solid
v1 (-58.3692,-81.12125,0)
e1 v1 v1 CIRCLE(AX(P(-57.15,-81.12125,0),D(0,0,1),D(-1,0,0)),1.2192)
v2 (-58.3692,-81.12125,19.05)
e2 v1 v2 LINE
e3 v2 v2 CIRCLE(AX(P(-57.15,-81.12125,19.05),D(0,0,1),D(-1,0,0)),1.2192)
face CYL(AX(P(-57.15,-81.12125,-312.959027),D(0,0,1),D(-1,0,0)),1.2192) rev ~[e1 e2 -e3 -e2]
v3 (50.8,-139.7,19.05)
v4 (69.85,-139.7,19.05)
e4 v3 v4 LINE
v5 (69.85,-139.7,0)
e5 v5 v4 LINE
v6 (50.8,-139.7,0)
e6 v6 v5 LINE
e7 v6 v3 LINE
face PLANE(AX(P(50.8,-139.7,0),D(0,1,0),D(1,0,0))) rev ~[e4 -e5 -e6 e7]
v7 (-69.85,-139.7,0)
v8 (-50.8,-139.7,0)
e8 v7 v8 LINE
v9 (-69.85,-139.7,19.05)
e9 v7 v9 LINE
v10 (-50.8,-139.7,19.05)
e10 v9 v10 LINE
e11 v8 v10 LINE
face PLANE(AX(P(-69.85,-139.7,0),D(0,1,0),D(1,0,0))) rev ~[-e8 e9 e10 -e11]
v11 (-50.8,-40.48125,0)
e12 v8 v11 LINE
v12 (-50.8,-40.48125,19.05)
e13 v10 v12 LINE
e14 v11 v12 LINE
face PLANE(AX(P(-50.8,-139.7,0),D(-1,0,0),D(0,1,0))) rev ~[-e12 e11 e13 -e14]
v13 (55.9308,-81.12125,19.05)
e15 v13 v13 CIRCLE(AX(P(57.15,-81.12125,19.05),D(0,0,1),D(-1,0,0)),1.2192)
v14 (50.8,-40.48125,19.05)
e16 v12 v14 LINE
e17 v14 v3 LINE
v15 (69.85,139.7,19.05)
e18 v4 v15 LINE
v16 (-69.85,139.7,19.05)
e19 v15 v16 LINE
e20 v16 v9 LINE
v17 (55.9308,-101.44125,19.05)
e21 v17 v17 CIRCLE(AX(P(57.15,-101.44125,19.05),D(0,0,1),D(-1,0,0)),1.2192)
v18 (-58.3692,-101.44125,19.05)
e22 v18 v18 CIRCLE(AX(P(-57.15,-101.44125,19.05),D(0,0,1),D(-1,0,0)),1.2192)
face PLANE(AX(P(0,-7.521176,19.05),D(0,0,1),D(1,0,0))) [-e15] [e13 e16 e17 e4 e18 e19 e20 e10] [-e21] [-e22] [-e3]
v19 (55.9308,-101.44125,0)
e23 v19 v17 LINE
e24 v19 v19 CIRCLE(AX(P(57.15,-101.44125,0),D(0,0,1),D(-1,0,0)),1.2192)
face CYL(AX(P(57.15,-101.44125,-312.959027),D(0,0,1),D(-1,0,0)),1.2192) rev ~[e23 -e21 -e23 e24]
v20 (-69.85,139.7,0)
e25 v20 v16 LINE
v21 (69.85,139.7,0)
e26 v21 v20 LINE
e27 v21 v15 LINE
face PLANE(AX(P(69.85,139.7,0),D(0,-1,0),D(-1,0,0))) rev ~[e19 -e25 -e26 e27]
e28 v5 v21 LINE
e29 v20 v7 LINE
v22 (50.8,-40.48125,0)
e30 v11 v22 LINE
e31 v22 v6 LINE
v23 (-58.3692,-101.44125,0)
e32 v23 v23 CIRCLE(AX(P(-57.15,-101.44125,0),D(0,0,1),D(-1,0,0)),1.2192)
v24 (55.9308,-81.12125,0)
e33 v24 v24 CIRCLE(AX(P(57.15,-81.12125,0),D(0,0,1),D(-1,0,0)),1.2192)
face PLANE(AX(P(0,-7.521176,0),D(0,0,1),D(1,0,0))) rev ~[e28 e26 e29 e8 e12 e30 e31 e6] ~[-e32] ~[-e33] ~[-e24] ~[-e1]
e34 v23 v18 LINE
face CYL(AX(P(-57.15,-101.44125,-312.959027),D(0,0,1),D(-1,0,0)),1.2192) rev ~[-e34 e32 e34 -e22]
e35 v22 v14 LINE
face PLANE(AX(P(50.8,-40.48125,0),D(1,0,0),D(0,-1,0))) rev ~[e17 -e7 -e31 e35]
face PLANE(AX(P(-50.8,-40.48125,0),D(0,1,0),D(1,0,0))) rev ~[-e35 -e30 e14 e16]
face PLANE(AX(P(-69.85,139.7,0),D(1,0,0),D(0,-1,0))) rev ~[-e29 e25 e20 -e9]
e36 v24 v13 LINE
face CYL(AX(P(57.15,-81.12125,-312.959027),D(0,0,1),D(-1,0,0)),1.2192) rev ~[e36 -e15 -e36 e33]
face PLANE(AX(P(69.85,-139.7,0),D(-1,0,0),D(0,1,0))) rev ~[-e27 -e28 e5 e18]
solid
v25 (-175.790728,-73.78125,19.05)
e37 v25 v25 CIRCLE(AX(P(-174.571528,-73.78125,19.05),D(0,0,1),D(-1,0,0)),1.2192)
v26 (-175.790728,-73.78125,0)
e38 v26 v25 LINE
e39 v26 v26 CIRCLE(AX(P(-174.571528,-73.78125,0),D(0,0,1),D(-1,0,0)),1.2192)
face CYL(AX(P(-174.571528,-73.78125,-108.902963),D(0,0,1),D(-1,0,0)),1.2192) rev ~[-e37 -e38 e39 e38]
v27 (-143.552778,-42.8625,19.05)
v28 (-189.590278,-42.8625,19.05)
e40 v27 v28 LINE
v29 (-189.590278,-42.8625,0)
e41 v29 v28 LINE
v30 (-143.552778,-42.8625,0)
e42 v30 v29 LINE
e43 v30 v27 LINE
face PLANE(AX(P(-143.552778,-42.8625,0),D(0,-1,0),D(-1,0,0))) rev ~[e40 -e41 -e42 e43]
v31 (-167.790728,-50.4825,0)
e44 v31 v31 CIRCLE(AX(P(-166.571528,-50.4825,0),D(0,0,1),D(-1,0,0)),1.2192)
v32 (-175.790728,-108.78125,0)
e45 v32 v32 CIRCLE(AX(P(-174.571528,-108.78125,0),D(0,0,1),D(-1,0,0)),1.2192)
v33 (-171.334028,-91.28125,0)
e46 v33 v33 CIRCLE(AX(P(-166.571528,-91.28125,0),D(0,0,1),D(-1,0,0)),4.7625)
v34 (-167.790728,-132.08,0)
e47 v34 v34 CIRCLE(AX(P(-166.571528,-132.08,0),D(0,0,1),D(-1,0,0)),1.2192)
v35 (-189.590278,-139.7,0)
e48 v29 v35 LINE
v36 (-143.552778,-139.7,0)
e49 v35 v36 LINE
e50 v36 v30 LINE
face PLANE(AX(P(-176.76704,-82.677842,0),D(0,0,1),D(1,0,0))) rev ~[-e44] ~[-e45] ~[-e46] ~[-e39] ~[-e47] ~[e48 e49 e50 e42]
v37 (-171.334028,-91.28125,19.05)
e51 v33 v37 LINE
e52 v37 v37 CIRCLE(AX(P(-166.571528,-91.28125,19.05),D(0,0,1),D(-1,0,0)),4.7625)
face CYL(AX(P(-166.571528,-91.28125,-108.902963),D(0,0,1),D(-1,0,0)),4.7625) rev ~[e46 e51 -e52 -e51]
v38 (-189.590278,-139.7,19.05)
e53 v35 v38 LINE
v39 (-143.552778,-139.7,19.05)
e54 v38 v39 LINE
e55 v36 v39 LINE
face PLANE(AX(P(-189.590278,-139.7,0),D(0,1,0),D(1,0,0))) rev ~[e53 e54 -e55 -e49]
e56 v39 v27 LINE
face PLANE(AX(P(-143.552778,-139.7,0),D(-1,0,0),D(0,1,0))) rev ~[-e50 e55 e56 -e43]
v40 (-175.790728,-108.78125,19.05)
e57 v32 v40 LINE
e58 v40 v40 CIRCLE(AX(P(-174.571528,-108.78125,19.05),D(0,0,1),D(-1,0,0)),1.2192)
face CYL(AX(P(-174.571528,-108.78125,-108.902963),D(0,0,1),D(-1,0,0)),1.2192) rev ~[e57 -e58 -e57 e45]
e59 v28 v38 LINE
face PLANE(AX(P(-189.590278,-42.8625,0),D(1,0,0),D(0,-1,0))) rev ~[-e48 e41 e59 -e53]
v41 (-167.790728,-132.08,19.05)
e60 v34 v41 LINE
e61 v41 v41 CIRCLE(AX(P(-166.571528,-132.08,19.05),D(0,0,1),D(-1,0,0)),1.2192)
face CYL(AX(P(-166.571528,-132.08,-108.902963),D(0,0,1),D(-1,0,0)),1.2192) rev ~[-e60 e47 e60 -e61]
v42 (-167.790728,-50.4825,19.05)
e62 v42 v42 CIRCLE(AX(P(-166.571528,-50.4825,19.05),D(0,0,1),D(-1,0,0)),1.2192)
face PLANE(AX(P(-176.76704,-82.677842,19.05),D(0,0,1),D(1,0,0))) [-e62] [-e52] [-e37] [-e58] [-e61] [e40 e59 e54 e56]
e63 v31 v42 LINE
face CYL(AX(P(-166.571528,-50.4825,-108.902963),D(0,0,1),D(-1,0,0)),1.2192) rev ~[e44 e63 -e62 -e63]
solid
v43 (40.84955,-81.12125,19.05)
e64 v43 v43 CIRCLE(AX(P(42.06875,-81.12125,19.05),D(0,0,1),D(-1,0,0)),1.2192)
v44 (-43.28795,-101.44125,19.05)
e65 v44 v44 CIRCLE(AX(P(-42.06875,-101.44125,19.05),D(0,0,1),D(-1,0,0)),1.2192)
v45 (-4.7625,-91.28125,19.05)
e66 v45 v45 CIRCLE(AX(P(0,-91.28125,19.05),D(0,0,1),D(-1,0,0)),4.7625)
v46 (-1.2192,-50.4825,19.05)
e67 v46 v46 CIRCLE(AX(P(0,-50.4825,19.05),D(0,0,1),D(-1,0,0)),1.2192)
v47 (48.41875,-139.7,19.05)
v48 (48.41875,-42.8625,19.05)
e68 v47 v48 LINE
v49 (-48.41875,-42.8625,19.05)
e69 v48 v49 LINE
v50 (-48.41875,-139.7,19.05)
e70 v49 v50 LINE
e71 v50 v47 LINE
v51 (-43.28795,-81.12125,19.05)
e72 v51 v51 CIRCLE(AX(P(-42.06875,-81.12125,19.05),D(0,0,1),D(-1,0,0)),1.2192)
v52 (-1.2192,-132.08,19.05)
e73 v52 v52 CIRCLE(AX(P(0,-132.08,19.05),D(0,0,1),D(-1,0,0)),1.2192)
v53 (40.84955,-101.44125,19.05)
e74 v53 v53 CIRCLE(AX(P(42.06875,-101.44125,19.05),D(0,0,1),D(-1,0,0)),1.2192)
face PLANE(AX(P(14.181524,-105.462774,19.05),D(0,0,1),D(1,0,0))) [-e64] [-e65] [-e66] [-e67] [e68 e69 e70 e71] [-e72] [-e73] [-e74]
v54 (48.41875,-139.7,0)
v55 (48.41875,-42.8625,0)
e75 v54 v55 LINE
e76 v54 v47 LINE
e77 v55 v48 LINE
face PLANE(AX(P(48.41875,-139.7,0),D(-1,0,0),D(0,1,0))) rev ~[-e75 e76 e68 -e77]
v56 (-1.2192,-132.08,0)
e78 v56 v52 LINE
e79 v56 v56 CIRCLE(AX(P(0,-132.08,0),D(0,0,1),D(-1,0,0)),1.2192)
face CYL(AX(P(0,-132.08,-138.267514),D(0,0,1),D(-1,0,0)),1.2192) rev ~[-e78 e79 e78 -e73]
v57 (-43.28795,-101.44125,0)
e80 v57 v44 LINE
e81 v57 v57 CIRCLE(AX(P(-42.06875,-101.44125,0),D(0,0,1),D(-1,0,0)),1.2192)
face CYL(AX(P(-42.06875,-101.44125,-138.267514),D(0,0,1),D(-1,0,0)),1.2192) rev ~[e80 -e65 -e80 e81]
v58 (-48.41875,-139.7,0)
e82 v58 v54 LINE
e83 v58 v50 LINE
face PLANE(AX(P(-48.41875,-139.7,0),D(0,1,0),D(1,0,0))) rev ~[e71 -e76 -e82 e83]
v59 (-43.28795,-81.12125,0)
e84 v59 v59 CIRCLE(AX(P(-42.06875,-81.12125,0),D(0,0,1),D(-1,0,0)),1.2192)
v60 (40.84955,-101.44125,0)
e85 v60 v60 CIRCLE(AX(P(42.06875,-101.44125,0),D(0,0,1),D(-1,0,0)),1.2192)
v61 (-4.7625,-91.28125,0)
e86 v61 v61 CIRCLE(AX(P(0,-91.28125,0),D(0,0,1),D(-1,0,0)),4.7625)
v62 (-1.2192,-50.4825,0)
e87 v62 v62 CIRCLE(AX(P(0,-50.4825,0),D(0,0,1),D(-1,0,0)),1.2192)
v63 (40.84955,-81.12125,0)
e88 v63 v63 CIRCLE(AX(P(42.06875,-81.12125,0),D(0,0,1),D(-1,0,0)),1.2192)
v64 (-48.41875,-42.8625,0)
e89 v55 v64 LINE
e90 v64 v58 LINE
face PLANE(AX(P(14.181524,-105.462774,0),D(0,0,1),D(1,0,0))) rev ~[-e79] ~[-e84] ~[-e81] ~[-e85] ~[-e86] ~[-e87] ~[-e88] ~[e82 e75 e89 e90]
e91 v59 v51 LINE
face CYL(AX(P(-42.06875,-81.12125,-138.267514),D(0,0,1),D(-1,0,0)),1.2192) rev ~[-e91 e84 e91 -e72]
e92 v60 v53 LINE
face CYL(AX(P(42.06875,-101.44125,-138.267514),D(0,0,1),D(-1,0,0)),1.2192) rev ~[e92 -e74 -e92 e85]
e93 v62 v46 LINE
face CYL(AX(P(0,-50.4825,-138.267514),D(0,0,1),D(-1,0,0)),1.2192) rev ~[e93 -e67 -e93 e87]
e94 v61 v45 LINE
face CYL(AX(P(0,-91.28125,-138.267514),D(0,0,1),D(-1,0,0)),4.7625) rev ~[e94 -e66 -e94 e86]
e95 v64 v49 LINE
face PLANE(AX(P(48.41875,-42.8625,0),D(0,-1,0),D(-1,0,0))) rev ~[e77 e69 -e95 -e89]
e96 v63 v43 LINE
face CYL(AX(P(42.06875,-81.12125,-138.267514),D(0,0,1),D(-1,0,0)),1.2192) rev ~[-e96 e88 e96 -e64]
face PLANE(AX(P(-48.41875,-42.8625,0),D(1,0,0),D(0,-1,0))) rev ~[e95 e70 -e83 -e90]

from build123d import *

# Parameters (mm, degrees)
F1_DEPTH = 19.05
F2_D     = 2.4384
F2_2_D   = 2.4384
F3_DEPTH = 19.05
F4_D     = 9.525
F4_2_D   = 9.525
F5_D     = 2.4384


# Not quite as in the source:
# - a feature names something its author has since deleted; it is built from what else it names


with BuildPart() as f1:
    # F0 (on Top) → F1 (new body)
    with BuildSketch(Plane.XY):
        Polygon((50.8, -139.7), (69.85, -139.7), (69.85, 139.7), (-69.85, 139.7), (-69.85, -139.7), (-50.8, -139.7), (-50.8, -40.48125), (50.8, -40.48125), align=None)
    extrude(amount=F1_DEPTH)

    # F2 (through all)
    with Locations(Plane(origin=(0, 0, 0), x_dir=(1, 0, 0), z_dir=(0, 0, -1))):
        with Locations((-57.15, 81.12125), (-57.15, 101.44125), (-42.06875, 101.44125), (-42.06875, 81.12125), (42.06875, 81.12125), (57.15, 81.12125), (57.15, 101.44125), (42.06875, 101.44125), (0, 50.4825), (0, 132.08)):
            Hole(F2_D / 2)


with BuildPart() as f1b:
    # F0 (on Top) → F1, piece 2 (new body)
    with BuildSketch(Plane.XY):
        Polygon((48.41875, -42.8625), (-48.41875, -139.7), (48.41875, -139.7), align=None)
        Polygon((-48.41875, -42.8625), (-48.41875, -139.7), (48.41875, -42.8625), align=None)
    extrude(amount=F1_DEPTH)

    # F2#2 (through all)
    with Locations(Plane(origin=(0, 0, 0), x_dir=(1, 0, 0), z_dir=(0, 0, -1))):
        with Locations((-57.15, 81.12125), (-57.15, 101.44125), (-42.06875, 101.44125), (-42.06875, 81.12125), (42.06875, 81.12125), (57.15, 81.12125), (57.15, 101.44125), (42.06875, 101.44125), (0, 50.4825), (0, 132.08)):
            Hole(F2_2_D / 2)

    # F4 (through all)
    with Locations(Plane(origin=(0, 0, 0), x_dir=(1, 0, 0), z_dir=(0, 0, -1))):
        with Locations((-166.5715282751, 91.28125), (0, 91.28125)):
            Hole(F4_D / 2)


with BuildPart() as f3:
    # F0 (on Top) → F3 (new body)
    with BuildSketch(Plane.XY):
        with BuildLine():
            ThreePointArc((-173.1950164444, -105.2134147701), (-187.2154043393, -85.270226953), (-162.8976236217, -83.5533815912))
            Line((-162.8976236217, -83.5533815912), (-143.5527782751, -42.8625))
            Line((-143.5527782751, -42.8625), (-189.5902782751, -42.8625))
            Line((-189.5902782751, -42.8625), (-189.5902782751, -61.9125))
            Line((-189.5902782751, -61.9125), (-189.5902782751, -120.65))
            Line((-189.5902782751, -120.65), (-189.5902782751, -139.7))
            Line((-189.5902782751, -139.7), (-173.1950164444, -105.2134147701))
        make_face()
        with BuildLine():
            ThreePointArc((-162.8976236217, -83.5533815912), (-161.1656589421, -87.2460712646), (-160.5715282751, -91.28125))
            ThreePointArc((-160.5715282751, -91.28125), (-164.1967712748, -100.6814849537), (-173.1950164444, -105.2134147701))
            Line((-173.1950164444, -105.2134147701), (-189.5902782751, -139.7))
            Line((-189.5902782751, -139.7), (-143.5527782751, -139.7))
            Line((-143.5527782751, -139.7), (-143.5527782751, -83.2121861219))
            Line((-143.5527782751, -83.2121861219), (-143.5527782751, -61.9125))
            Line((-143.5527782751, -61.9125), (-143.5527782751, -42.8625))
            Line((-143.5527782751, -42.8625), (-162.8976236217, -83.5533815912))
        make_face()
        with BuildLine():
            Line((-173.1950164444, -105.2134147701), (-162.8976236217, -83.5533815912))
            ThreePointArc((-162.8976236217, -83.5533815912), (-187.2154043393, -85.270226953), (-173.1950164444, -105.2134147701))
        make_face()
        with BuildLine():
            ThreePointArc((-173.1950164444, -105.2134147701), (-164.1967712748, -100.6814849537), (-160.5715282751, -91.28125))
            ThreePointArc((-160.5715282751, -91.28125), (-161.1656589421, -87.2460712646), (-162.8976236217, -83.5533815912))
            Line((-162.8976236217, -83.5533815912), (-173.1950164444, -105.2134147701))
        make_face()
    extrude(amount=F3_DEPTH)

    # F4#2 (through all)
    with Locations(Plane(origin=(0, 0, 0), x_dir=(1, 0, 0), z_dir=(0, 0, -1))):
        with Locations((-166.5715282751, 91.28125), (0, 91.28125)):
            Hole(F4_2_D / 2)

    # F5 (through all)
    with Locations(Plane(origin=(0, 0, 0), x_dir=(1, 0, 0), z_dir=(0, 0, -1))):
        with Locations((-166.5715282751, 50.4825), (-174.5715282751, 73.78125), (-174.5715282751, 108.78125), (-166.5715282751, 132.08)):
            Hole(F5_D / 2)


solid = Compound([f1.part, f1b.part, f3.part])
